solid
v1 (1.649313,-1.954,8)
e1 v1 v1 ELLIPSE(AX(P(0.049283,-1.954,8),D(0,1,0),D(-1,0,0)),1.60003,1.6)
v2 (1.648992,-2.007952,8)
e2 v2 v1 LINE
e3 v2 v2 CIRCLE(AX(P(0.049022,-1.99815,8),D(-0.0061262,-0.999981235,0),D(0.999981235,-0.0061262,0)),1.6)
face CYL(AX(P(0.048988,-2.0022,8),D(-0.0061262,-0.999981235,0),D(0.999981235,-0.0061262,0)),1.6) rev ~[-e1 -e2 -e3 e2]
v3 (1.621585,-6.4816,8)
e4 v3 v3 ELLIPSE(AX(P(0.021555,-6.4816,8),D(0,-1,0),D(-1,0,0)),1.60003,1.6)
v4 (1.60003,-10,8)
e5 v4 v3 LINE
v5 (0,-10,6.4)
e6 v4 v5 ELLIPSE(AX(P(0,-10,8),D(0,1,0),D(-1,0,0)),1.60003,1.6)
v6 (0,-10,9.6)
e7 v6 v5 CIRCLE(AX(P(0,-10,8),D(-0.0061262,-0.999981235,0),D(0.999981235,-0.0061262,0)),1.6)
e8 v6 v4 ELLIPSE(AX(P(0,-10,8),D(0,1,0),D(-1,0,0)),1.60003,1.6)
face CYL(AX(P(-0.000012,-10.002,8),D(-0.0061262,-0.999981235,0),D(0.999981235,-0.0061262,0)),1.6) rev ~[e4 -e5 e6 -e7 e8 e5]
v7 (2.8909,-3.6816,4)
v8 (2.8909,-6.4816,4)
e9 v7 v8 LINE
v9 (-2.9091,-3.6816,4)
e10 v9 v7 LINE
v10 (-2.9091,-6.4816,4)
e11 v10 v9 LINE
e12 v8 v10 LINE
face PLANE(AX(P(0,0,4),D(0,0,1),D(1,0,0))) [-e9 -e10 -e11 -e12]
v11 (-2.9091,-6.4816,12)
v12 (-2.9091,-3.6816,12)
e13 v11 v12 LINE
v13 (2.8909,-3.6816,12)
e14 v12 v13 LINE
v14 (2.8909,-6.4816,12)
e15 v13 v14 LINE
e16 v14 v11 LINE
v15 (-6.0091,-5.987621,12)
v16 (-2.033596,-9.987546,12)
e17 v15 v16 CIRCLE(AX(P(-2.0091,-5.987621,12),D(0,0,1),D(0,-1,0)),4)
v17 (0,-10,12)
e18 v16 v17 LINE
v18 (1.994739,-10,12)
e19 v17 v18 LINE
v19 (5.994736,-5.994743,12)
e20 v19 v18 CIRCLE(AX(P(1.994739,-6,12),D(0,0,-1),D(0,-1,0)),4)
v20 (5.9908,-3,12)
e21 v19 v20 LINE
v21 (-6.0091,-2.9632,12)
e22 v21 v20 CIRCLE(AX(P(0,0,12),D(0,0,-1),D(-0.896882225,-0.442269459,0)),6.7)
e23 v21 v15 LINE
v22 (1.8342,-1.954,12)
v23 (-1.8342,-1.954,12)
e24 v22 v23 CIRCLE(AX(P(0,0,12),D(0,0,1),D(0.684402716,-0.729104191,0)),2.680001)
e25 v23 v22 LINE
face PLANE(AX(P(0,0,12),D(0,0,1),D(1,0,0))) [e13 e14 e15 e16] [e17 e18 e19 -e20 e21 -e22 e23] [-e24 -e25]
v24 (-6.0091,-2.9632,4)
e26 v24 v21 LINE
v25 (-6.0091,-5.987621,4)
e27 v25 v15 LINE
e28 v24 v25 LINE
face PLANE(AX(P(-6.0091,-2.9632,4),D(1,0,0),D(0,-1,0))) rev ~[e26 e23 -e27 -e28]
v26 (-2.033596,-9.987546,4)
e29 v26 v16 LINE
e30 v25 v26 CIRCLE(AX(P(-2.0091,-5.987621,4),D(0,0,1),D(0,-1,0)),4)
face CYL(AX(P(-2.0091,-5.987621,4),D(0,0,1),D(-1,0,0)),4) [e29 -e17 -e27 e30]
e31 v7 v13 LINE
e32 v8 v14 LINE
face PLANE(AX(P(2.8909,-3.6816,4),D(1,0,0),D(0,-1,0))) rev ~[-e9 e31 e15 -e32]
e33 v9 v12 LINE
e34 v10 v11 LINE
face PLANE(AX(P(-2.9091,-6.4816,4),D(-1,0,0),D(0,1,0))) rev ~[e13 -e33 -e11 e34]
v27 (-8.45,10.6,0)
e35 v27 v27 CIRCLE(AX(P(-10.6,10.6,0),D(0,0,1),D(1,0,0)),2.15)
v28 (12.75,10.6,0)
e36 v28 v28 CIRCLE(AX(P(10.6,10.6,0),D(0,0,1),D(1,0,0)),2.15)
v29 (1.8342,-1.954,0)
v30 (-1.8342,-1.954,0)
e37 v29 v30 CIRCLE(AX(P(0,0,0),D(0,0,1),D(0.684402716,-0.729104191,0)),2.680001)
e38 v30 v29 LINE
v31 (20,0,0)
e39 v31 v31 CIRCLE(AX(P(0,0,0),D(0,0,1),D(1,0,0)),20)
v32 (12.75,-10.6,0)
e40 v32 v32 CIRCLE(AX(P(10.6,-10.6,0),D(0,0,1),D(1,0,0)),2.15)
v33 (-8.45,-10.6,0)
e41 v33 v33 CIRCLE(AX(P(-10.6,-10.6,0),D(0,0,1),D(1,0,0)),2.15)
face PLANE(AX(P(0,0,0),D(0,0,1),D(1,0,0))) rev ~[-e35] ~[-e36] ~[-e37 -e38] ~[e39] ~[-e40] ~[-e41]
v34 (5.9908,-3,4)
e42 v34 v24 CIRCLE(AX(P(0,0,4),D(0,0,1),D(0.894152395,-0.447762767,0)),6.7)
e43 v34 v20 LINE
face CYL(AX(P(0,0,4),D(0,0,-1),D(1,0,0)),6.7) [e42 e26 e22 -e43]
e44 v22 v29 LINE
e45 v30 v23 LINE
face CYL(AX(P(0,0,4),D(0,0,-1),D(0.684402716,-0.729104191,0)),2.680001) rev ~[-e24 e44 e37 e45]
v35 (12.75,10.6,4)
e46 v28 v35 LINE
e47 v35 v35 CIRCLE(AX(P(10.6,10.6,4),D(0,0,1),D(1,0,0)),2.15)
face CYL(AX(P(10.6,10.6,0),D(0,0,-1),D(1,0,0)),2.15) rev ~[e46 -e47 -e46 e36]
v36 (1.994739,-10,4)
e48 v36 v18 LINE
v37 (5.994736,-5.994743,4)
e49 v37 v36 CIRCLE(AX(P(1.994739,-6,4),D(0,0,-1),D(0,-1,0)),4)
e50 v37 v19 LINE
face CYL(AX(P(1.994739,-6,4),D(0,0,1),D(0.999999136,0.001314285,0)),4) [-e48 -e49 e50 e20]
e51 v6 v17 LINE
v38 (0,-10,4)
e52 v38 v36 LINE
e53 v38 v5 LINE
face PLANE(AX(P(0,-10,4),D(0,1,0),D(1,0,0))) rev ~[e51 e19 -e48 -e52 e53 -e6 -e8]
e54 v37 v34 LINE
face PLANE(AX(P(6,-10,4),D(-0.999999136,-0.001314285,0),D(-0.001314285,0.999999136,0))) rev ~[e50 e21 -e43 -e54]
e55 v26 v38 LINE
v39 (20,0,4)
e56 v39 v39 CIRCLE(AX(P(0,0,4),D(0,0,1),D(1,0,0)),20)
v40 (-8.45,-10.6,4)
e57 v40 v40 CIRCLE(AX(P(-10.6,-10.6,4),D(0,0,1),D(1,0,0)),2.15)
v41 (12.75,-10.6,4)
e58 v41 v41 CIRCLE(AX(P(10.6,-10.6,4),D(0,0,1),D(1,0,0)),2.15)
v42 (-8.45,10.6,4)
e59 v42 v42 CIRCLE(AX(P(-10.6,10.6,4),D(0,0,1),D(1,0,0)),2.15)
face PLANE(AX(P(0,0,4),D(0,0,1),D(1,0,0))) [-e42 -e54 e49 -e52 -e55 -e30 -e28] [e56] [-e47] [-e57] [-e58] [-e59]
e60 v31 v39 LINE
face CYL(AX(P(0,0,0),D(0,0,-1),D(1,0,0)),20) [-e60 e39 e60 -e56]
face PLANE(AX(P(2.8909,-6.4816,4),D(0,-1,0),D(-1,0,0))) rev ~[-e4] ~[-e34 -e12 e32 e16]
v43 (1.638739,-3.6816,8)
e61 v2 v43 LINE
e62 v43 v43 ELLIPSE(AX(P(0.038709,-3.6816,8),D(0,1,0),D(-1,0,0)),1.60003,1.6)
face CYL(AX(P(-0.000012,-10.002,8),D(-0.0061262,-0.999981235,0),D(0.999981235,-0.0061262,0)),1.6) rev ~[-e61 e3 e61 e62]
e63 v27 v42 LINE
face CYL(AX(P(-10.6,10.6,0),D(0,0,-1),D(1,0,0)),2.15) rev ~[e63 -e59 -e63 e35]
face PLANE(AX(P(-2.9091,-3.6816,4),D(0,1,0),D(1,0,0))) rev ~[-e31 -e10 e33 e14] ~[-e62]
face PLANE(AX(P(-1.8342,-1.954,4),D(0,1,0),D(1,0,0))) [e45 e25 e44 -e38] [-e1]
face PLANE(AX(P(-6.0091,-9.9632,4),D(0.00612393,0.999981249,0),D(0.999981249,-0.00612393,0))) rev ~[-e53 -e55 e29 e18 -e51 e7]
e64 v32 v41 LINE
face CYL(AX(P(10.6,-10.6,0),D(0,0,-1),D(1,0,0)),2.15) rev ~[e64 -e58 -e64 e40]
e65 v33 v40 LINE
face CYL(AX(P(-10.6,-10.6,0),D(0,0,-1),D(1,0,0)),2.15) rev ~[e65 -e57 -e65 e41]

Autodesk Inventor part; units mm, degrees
ref_plane "YZ Plane" through (0, 0, 0) normal (1, 0, 0) x (0, 1, 0)
ref_plane "XZ Plane" through (0, 0, 0) normal (0, 1, 0) x (-1, 0, 0)
ref_plane "XY Plane" through (0, 0, 0) normal (0, 0, 1) x (1, 0, 0)
sketch "Szkic1" plane through (0, 0, 0) normal (0, 0, 1) x (1, 0, 0)
  circle A0 centre (0, 0) radius 20
  circle A1 centre (10.6, 10.6) radius 2.15
  circle A2 centre (-10.6, 10.6) radius 2.15
  circle A3 centre (-10.6, -10.6) radius 2.15
  circle A4 centre (10.6, -10.6) radius 2.15
  arc A5 (1.8342, -1.954) -> (-1.8342, -1.954) centre (0, 0) ccw
  line L0 (0, -1.954) -> (1.8342, -1.954)
  line L1 (0, -1.954) -> (-1.8342, -1.954)
  dimension "d0" = 40
  dimension "d3" = 4.3
  dimension "d6" = 360
  dimension "d8" = 5.36
extrude "Wyciągnięcie proste1" add sketch "Szkic1" along normal blind 4
sketch "Szkic2" plane through (0, 0, 4) normal (0, 0, 1) x (1, 0, 0)
  arc A0 (5.9908, -3) -> (-6.0091, -2.9632) centre (0, 0) ccw
  circle A1 centre (0, 0) radius 20 projected
  line L0 (0, -10) -> (6, -10)
  line L1 (6, -10) -> (5.9908, -3)
  line L2 (5.9908, -3) -> (-6.0091, -2.9632)
  line L3 (-6.0091, -2.9632) -> (-6.0091, -9.9632)
  line L4 (-6.0091, -9.9632) -> (0, -10)
  line L5 (-0.0091, -3.6816) -> (2.8909, -3.6816)
  line L6 (2.8909, -3.6816) -> (2.8909, -6.4816)
  line L7 (2.8909, -6.4816) -> (-2.9091, -6.4816)
  line L8 (-2.9091, -6.4816) -> (-2.9091, -3.6816)
  line L9 (-2.9091, -3.6816) -> (-0.0091, -3.6816)
  dimension "d12" = 13.4
  dimension "d19" = 6
  dimension "d20" = 7
  dimension "d21" = 12
  dimension "d24" = 7
  dimension "d26" = 2.9
  dimension "d27" = 2.8
  dimension "d28" = 5.8
extrude "Wyciągnięcie proste2" add sketch "Szkic2" along normal blind 8 contours L1 L0 L4 L3 L2
sketch "Szkic3" plane through (0, 0, 4) normal (0, 0, 1) x (1, 0, 0)
  circle A0 centre (0, 0) radius 6.7
  line L0 (-6.0091, -9.9632) -> (-6.0091, -2.9632) projected
  line L1 (6, -10) -> (5.9908, -3) projected
  line L2 (-6.0091, -2.9632) -> (5.9908, -3)
  dimension "d31" = 13.4
sketch "Szkic4" plane through (0, 0, 4) normal (0, 0, 1) x (1, 0, 0)
  arc A0 (1.8342, -1.954) -> (-1.8342, -1.954) centre (0, 0) ccw projected
  line L0 (-1.8342, -1.954) -> (1.8342, -1.954)
  arc A1 (1.8342, -1.954) -> (-1.8342, -1.954) centre (0, 0) ccw
sketch "Szkic5" plane through (0, 0, 4) normal (0, 0, 1) x (1, 0, 0)
  point P0 (0, 0)
extrude "Wyciągnięcie proste3" add sketch "Szkic3" along normal blind 8 contours A0 L2 picked at (-1.2468, -0.1308)
extrude "Wyciągnięcie proste4" cut sketch "Szkic4" along normal blind 8
sketch "Szkic6" plane through (0, -10, 4) normal (-0.0061262, -0.9999812, 0) x (0.9999812, -0.0061262, 0)
  circle A0 centre (0, 4) radius 1.6
  point P0 (-0.0613, -4)
  point P1 (0, 0)
  dimension "d37" = 3.2
extrude "Wyciągnięcie proste5" cut sketch "Szkic6" against normal blind 8
sketch "Szkic7" plane through (0.049, -2.0002, 8) normal (-0.0061262, -0.9999812, 0) x (0.9999812, -0.0061262, 0)
  point P0 (-0.0613, -8)
sketch "Szkic8" plane through (0.049, -2.0002, 8) normal (-0.0061262, -0.9999812, 0) x (0.9999812, -0.0061262, 0)
  circle A0 centre (0, 0) radius 1.6
  point P0 (-0.0613, -8)
  dimension "d40" = 3.2
extrude "Wyciągnięcie proste6" cut sketch "Szkic8" against normal blind 2
fillet "Zaokrąglenie1" radius 4 1 edges at (-6.0091, -9.9632, 8)
fillet "Zaokrąglenie2" radius 4 1 edges at (6, -10, 8)
sketch "Szkic9" plane through (0, -10, 8) normal (-0.0061262, -0.9999812, 0) x (0.9999812, -0.0061262, 0)
  point P0 (-0.0613, -8)
properties part number "sprzeglo"
